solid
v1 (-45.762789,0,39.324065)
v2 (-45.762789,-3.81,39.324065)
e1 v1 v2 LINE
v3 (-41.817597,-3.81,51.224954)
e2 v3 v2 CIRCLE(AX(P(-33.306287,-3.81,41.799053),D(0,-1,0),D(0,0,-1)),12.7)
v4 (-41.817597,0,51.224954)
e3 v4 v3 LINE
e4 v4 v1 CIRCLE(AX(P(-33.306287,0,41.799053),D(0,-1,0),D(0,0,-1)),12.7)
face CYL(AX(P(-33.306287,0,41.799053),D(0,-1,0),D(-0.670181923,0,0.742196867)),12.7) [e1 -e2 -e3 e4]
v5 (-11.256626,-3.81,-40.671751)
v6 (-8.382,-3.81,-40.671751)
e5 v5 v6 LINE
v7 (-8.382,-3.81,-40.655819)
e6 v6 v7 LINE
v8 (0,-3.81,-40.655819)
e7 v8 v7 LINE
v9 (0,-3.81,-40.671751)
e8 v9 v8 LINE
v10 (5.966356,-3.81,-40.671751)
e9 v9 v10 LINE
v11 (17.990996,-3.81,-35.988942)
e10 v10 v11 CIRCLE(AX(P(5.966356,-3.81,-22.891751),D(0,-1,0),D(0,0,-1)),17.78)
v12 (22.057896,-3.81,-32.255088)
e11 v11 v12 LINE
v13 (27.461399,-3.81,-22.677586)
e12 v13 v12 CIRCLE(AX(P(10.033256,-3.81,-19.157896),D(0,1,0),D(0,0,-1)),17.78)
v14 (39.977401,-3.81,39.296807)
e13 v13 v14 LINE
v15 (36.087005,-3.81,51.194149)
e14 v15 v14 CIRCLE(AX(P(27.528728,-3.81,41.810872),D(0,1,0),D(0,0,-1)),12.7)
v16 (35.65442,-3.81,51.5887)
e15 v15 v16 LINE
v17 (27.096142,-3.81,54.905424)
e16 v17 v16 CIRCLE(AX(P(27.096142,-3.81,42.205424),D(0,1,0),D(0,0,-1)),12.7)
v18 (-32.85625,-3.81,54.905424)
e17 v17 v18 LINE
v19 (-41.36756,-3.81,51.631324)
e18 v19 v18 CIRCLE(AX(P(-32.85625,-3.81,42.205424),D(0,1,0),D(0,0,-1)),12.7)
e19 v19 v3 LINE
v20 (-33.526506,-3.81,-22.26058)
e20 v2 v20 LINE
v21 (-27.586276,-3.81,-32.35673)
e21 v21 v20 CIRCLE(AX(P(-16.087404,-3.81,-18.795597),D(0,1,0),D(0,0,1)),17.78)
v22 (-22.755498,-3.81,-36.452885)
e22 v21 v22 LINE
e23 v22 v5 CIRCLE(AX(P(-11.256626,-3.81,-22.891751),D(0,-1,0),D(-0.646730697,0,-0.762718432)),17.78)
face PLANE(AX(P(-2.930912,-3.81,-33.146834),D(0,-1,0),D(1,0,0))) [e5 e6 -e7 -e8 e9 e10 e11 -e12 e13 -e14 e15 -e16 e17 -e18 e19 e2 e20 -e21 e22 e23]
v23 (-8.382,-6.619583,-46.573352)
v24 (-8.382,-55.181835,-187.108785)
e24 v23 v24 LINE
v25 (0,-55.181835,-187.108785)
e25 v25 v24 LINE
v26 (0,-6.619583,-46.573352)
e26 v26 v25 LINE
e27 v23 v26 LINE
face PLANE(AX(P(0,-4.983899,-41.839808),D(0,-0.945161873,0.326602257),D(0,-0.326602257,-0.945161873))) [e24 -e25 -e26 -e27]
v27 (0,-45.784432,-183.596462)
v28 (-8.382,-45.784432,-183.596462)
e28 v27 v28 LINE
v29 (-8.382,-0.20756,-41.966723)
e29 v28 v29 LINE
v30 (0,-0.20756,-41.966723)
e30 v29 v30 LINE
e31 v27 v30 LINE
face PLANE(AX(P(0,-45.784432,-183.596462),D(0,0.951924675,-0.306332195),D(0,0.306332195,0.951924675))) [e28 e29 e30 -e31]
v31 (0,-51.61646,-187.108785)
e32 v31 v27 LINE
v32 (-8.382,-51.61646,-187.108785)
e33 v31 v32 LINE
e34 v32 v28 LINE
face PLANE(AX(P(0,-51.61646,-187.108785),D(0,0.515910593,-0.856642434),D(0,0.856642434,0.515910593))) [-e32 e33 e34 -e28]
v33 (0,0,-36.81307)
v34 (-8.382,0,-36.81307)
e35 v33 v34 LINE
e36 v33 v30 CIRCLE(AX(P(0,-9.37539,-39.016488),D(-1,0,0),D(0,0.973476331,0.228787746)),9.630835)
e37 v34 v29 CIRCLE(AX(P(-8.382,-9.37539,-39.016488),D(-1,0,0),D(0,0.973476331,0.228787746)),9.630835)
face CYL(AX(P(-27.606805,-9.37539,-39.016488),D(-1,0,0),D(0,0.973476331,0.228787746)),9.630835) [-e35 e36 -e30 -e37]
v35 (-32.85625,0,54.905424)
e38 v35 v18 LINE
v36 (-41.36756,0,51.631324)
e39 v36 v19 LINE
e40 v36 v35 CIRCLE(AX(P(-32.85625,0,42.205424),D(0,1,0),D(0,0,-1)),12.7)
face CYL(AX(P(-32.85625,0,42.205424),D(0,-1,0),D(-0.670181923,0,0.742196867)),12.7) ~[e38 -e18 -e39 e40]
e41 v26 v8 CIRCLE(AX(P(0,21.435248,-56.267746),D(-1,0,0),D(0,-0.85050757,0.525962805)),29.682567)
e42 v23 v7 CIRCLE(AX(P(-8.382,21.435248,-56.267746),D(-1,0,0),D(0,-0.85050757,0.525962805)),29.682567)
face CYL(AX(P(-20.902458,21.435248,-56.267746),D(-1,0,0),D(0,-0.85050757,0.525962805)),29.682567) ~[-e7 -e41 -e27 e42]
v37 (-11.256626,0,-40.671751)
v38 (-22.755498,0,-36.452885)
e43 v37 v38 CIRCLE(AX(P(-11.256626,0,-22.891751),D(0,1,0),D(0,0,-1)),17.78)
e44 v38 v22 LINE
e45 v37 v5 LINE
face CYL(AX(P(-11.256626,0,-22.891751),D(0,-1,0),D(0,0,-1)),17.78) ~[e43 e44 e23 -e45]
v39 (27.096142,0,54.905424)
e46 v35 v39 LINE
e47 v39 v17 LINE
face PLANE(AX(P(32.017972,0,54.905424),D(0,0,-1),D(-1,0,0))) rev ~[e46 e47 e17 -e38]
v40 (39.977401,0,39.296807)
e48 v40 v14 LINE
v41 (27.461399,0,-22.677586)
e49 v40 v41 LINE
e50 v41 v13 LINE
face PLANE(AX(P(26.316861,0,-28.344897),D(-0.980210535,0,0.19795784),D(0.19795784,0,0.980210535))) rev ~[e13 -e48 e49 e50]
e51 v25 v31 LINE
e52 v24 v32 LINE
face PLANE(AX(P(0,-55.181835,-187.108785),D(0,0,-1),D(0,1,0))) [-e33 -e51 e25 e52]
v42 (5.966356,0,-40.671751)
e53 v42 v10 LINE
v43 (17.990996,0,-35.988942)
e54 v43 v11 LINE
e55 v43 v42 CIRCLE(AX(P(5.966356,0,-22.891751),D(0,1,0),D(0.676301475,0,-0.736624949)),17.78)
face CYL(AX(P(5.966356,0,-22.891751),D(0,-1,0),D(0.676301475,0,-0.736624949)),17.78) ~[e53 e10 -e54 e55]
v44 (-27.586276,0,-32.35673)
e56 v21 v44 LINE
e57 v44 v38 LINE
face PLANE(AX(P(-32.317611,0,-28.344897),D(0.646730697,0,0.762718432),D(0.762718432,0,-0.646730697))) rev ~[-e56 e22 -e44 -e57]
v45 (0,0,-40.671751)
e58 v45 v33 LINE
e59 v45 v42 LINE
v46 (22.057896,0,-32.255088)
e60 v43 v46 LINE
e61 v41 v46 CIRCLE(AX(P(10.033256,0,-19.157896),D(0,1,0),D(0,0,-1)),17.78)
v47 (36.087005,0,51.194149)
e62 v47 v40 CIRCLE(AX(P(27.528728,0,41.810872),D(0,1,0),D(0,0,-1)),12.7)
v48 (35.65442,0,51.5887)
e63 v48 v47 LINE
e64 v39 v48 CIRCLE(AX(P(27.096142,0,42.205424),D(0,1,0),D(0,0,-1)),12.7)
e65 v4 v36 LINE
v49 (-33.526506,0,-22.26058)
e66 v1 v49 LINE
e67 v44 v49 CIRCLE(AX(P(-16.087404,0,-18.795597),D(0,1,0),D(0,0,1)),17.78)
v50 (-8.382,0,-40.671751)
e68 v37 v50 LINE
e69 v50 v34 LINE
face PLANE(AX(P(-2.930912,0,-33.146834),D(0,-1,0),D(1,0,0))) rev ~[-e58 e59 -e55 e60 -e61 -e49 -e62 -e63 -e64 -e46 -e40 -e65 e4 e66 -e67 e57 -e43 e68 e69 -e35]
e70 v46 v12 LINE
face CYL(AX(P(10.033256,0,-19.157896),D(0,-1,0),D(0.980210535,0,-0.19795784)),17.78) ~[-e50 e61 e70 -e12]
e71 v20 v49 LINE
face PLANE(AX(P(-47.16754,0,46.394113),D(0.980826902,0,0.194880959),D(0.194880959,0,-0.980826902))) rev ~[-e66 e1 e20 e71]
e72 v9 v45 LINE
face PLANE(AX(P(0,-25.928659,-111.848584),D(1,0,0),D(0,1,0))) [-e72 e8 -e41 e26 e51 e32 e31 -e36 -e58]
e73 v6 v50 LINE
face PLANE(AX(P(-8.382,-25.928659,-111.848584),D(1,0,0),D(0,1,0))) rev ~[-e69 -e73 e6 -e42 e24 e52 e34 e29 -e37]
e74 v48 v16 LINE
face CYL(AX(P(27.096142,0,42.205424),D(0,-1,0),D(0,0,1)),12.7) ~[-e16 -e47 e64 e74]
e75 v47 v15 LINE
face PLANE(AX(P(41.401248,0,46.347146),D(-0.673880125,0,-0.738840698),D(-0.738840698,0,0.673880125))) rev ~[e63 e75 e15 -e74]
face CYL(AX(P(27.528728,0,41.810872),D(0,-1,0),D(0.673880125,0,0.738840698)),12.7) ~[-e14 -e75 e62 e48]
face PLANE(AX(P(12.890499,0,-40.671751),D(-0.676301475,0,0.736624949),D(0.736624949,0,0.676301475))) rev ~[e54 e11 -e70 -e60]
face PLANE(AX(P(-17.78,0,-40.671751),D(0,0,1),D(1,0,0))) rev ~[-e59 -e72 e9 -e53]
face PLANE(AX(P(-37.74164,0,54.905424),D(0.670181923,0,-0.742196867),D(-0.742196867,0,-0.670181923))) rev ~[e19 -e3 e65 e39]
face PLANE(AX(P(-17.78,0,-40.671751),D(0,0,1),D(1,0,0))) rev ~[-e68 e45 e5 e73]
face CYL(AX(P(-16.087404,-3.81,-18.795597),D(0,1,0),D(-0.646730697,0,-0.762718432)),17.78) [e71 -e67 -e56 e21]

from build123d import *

# Parameters (mm, degrees)
F1_DEPTH     = 3.556
F2_R         = 12.7
F5_R         = 13.0437301263
F6_DEPTH     = 3.81
F7_R         = 12.7
F8_R         = 17.78
F10_DEPTH    = 8.382
F11_T1_DEPTH = 46.8316092758
F12_T1_DEPTH = 33.4229165443


# Not quite as in the source:
# - a fillet or chamfer that OpenCascade refuses, or shapes differently, is made with other operations: its cross-section is extruded or revolved along the edge and cut away or added
# - two fillets or chamfers of one size are made in one step


with BuildPart() as f1:
    # F0 (on Front) → F1 (new body)
    with BuildSketch(Plane.XZ):
        Polygon((-47.1675397517, 46.3941131987), (-32.3176106954, -28.3448967427), (26.3168609286, -28.3448967427), (41.4012483693, 46.3471460432), (32.0179715002, 54.9054236268), (-37.7416395402, 54.9054236268), align=None)
    extrude(amount=F1_DEPTH)

    # F2
    f2_edges = [f1.edges().sort_by_distance(p)[0] for p in [
        (-47.16754, -1.778, 46.394113),
        (41.401248, -1.778, 46.347146),
        (32.017972, -1.778, 54.905424),
        (-37.74164, -1.778, 54.905424),
    ]]
    fillet(f2_edges, radius=F2_R)

    # F5
    f5_edges = [f1.edges().sort_by_distance(p)[0] for p in [
        (26.316861, -1.778, -28.344897),
    ]]
    fillet(f5_edges, radius=F5_R)

    # F0 (on Front) → F6 (join)
    with BuildSketch(Plane.XZ):
        Polygon((26.3168609286, -28.3448967427), (-32.3176106954, -28.3448967427), (-17.7800003439, -40.6717509031), (12.8904990852, -40.6717509031), align=None)
        Polygon((-47.1675397517, 46.3941131987), (-32.3176106954, -28.3448967427), (26.3168609286, -28.3448967427), (41.4012483693, 46.3471460432), (32.0179715002, 54.9054236268), (-37.7416395402, 54.9054236268), align=None)
    extrude(amount=F6_DEPTH)

    # F7
    f7_edges = [f1.edges().sort_by_distance(p)[0] for p in [
        (32.017972, -1.905, 54.905424),
        (41.401248, -1.905, 46.347146),
        (-37.74164, -1.905, 54.905424),
        (-47.16754, -1.905, 46.394113),
    ]]
    fillet(f7_edges, radius=F7_R)

    # F8
    f8_edges = [f1.edges().sort_by_distance(p)[0] for p in [
        (-17.78, -1.905, -40.671751),
        (12.890499, -1.905, -40.671751),
        (26.316861, -1.905, -28.344897),
        (-32.317611, -1.905, -28.344897),
    ]]
    fillet(f8_edges, radius=F8_R)

    # F9 (on Right) → F10 (join)
    with BuildSketch(Plane.YZ):
        Polygon((-55.1818351742, -187.108784914), (-51.6164600849, -187.108784914), (-45.784432441, -183.5964620113), (2.1481101867, -34.6464961767), (-4.9838987179, -41.8398082256), align=None)
    extrude(amount=-F10_DEPTH)

    # F11: fillet of radius 9.6308354503 on 1 edges, made by hand

    # F11_s2 → F11_t1 (cut)
    with BuildSketch(Plane.YZ.offset(-27.6068046379)):
        with BuildLine():
            ThreePointArc((0, -36.813070433), (0.2476438249, -39.4040498919), (-0.2075604578, -41.9667225361))
            Line((-0.2075604578, -41.9667225361), (2.1481101867, -34.6464961767))
            Line((2.1481101867, -34.6464961767), (0, -36.813070433))
        make_face()
    extrude(amount=F11_T1_DEPTH, mode=Mode.SUBTRACT)

    # F12: fillet of radius 29.6825671573 on 1 edges, made by hand

    # F12_s2 → F12_t1 (cut)
    with BuildSketch(Plane.YZ.offset(-20.9024582721)):
        with BuildLine():
            ThreePointArc((-3.81, -40.6558192676), (-5.3785338271, -43.5368424871), (-6.6195826892, -46.5733521413))
            Line((-6.6195826892, -46.5733521413), (-4.9838987179, -41.8398082256))
            Line((-4.9838987179, -41.8398082256), (-3.81, -40.6558192676))
        make_face()
    extrude(amount=F12_T1_DEPTH, mode=Mode.SUBTRACT)


solid = f1.part
